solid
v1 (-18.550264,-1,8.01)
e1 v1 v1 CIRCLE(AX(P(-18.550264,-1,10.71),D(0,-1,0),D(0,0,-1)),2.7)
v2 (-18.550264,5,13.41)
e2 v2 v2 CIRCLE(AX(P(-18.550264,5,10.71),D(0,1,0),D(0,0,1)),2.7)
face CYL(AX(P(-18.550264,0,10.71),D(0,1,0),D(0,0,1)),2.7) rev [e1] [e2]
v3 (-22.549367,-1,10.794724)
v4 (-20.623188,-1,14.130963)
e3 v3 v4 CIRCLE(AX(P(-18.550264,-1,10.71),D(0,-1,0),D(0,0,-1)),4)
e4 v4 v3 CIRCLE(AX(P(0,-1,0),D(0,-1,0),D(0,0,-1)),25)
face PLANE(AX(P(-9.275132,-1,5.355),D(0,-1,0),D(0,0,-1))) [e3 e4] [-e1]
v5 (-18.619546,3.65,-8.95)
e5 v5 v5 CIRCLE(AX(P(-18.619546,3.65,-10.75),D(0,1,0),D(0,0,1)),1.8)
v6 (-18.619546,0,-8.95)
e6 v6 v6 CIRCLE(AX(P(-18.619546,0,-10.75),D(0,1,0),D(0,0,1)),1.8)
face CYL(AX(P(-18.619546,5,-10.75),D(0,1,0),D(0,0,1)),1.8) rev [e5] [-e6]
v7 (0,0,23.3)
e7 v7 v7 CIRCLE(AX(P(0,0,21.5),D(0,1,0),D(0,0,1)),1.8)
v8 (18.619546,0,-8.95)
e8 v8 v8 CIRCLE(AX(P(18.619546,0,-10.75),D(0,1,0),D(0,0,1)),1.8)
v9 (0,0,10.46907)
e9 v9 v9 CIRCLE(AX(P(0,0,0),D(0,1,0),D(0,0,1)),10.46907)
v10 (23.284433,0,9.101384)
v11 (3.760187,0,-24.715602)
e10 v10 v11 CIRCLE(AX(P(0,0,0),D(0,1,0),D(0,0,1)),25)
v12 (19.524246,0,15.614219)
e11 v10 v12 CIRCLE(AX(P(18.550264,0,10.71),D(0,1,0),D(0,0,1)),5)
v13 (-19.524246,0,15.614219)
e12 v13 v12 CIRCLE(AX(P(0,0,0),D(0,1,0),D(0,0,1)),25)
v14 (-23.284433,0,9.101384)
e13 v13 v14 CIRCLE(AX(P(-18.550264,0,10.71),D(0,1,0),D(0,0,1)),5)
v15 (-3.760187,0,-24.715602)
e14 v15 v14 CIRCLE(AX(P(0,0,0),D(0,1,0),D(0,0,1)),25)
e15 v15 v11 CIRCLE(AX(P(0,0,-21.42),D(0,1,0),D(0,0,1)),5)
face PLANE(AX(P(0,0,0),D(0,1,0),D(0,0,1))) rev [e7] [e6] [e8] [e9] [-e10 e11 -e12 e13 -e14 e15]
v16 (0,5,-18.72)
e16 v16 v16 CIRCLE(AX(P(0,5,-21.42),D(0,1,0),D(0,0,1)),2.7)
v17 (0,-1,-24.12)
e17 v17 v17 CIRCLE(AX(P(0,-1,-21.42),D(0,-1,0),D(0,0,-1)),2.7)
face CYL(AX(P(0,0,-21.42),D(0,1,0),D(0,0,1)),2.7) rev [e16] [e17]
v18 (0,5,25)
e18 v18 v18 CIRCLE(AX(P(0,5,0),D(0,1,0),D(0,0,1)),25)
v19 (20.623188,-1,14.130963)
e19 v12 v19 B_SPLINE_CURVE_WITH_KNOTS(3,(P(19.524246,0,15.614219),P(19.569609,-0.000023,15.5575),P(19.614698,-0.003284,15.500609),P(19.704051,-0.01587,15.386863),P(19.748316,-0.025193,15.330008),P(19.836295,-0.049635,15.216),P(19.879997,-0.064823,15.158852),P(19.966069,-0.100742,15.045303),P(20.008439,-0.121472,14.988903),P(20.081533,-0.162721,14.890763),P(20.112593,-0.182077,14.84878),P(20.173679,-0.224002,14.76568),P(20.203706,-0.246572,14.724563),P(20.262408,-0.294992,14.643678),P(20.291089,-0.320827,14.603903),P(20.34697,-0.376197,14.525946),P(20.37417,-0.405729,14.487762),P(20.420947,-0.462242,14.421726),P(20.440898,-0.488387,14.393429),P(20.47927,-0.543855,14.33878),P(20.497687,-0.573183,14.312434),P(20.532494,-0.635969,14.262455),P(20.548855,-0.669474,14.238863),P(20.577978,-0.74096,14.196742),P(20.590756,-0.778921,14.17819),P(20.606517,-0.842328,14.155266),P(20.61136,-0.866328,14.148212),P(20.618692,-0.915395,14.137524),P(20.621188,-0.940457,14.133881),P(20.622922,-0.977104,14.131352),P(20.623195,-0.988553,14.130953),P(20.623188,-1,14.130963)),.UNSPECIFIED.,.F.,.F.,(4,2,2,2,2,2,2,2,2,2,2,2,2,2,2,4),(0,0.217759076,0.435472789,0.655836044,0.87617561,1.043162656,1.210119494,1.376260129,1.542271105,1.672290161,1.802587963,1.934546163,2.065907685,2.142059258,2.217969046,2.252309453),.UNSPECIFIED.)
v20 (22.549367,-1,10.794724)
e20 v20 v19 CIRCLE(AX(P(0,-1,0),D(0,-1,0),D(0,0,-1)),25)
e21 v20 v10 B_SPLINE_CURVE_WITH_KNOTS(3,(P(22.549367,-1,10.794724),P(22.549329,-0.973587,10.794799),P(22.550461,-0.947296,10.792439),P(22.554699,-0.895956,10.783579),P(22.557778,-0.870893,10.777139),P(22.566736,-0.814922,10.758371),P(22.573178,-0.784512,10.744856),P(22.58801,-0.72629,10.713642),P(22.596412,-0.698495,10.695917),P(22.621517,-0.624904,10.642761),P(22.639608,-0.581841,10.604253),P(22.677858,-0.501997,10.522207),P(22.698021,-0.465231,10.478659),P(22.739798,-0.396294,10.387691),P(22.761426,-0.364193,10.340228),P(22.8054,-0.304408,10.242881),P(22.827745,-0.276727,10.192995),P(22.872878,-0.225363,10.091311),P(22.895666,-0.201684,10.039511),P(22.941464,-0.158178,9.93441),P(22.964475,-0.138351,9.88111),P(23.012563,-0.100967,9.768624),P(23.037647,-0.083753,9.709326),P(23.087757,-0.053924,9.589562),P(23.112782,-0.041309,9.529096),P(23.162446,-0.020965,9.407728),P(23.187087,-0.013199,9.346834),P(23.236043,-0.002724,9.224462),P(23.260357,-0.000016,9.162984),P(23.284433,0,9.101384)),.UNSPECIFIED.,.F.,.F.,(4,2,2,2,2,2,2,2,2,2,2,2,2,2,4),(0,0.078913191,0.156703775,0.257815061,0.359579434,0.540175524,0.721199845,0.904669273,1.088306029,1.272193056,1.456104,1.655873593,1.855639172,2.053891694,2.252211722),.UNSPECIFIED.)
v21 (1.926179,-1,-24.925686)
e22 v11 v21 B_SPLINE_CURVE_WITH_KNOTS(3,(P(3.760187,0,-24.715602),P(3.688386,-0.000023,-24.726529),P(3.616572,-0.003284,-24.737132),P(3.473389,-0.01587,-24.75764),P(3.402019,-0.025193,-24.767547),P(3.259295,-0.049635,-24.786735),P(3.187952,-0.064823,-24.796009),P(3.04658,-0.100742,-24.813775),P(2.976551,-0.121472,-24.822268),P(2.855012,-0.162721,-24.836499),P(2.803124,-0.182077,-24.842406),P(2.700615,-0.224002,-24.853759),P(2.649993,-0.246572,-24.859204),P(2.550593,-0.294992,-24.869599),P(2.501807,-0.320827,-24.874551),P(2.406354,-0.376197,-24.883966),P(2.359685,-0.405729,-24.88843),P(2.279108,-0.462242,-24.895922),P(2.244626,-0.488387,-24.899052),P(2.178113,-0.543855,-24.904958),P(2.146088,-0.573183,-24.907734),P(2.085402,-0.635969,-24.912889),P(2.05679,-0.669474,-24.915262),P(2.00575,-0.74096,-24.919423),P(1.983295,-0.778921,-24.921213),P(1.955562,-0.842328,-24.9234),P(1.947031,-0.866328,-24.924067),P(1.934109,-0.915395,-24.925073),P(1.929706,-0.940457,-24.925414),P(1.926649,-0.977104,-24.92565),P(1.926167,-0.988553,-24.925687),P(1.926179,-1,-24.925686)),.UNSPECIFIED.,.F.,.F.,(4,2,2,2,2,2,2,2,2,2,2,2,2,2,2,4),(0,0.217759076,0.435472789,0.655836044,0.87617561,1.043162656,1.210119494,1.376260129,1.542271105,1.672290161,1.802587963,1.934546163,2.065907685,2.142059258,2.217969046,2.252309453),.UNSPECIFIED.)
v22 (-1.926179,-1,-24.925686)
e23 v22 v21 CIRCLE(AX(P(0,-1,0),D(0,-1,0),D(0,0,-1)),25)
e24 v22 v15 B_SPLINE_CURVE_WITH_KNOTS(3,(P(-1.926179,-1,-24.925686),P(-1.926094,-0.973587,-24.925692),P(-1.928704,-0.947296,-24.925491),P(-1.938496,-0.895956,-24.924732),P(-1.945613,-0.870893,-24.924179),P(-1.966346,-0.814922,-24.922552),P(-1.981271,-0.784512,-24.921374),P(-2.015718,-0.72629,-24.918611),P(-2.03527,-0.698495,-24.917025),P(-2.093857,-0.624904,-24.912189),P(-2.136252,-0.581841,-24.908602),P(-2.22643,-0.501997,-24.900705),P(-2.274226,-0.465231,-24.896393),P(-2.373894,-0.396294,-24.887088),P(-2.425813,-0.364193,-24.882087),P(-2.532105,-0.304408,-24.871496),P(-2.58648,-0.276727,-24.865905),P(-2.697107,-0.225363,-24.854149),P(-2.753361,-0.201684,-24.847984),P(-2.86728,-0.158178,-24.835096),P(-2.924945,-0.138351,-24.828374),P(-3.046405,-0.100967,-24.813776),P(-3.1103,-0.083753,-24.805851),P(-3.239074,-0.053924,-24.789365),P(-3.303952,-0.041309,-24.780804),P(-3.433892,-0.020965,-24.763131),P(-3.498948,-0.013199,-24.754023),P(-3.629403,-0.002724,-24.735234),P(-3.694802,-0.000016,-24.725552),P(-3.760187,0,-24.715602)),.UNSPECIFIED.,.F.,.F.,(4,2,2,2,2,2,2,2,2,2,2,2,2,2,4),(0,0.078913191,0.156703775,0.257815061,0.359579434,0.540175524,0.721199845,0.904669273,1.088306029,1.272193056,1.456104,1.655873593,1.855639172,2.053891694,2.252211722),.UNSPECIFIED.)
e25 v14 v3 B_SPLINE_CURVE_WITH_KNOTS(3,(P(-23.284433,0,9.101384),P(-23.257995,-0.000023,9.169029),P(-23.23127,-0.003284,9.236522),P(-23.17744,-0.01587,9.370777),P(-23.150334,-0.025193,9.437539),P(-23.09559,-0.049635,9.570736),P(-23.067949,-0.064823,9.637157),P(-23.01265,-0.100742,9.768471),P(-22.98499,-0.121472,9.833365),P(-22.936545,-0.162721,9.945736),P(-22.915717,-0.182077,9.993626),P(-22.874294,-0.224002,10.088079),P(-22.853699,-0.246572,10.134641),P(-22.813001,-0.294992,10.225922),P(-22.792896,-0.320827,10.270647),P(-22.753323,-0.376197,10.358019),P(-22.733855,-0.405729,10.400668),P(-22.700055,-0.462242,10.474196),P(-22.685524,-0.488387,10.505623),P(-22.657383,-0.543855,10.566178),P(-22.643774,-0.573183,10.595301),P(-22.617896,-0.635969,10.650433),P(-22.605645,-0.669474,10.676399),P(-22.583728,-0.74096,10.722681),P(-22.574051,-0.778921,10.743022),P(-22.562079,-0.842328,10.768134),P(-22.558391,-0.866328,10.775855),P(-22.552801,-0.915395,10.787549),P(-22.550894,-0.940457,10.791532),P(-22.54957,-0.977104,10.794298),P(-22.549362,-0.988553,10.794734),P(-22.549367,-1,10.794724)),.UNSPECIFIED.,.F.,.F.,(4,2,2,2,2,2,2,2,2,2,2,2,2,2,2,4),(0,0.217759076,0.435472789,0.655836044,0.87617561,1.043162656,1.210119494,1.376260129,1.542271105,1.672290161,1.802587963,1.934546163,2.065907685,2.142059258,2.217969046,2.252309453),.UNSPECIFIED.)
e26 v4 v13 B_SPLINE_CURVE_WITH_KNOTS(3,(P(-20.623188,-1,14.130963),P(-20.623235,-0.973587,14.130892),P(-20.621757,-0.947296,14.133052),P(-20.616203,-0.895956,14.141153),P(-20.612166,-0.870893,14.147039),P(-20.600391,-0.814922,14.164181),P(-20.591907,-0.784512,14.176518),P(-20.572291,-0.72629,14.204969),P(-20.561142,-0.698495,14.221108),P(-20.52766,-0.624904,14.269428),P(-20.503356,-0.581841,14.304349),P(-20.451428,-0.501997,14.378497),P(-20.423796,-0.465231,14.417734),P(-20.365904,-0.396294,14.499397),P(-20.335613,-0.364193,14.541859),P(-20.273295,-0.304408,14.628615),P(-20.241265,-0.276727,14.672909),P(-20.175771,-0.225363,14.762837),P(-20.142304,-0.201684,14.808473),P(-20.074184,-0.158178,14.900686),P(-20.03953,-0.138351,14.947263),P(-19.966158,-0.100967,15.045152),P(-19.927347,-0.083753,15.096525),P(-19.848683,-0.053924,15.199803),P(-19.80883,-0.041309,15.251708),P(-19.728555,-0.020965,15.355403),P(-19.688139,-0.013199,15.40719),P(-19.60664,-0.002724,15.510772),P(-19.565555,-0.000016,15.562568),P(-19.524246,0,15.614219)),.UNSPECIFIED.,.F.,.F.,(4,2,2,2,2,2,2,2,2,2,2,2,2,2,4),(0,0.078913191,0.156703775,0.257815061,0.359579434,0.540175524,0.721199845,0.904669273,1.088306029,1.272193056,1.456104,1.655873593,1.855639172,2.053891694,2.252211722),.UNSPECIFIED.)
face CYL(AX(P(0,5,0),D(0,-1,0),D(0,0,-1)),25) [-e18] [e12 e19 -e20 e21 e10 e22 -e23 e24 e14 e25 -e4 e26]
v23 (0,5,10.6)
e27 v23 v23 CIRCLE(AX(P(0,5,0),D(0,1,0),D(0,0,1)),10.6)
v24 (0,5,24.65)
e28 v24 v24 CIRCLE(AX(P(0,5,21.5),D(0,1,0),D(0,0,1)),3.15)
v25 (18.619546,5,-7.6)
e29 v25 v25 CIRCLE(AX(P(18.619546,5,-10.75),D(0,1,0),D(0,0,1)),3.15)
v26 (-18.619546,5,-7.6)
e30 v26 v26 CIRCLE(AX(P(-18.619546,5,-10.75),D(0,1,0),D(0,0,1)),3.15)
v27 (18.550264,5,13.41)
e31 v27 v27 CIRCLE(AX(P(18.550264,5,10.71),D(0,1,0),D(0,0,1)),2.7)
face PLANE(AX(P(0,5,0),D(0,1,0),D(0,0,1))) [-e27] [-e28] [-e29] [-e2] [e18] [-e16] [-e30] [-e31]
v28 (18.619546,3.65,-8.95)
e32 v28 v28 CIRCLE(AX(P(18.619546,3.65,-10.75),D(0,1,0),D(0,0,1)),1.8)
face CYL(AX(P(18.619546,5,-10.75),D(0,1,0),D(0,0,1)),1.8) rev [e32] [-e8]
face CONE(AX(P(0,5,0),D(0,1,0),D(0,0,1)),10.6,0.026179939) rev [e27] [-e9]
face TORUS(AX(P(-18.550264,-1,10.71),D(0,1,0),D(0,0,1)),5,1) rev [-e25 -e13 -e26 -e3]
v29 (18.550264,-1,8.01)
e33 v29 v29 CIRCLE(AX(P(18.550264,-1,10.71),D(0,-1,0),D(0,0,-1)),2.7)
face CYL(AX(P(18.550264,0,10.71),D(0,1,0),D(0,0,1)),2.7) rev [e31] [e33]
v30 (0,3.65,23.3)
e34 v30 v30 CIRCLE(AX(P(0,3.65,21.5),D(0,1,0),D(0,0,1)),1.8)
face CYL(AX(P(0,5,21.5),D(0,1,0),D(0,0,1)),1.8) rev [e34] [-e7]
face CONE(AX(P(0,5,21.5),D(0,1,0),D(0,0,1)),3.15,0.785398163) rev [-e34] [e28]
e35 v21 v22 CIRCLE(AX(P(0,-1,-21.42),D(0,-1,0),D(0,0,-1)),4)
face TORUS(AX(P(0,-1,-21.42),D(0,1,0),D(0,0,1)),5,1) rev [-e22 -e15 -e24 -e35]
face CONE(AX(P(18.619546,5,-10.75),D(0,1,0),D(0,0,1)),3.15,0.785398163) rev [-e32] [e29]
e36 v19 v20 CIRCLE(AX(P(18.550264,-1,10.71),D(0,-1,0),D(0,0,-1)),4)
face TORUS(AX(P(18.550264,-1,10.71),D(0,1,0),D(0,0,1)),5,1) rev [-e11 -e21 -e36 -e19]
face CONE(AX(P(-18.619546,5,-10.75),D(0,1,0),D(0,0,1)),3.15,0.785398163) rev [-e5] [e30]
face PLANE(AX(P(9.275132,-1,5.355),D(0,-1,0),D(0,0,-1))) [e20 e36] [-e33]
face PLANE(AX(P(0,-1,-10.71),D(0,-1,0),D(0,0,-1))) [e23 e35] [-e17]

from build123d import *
from build123d.topology import SkipClean

# Parameters (mm, degrees)
CROQUIS1_R                                           = 25
SALIENTE_EXTRUIR1_DEPTH                              = 5
CROQUIS2_R                                           = 2.7
CORTAR_EXTRUIR2_DEPTH                                = 5
CROQUIS3_R                                           = 1.45
CORTAR_EXTRUIR3_DEPTH                                = 5
CROQUIS4_R                                           = 10.6
CORTAR_EXTRUIR4_DEPTH                                = 5
CORTAR_EXTRUIR4_DRAFT                                = -1.5
AVELLANADO_PARA_TORNILLO_CON_CABEZA_PLAN_D           = 3.6
AVELLANADO_PARA_TORNILLO_CON_CABEZA_PLAN_CSINK_D     = 6.3
AVELLANADO_PARA_TORNILLO_CON_CABEZA_PLAN_CSINK_ANGLE = 90
CROQUIS7_R                                           = 2.7
SALIENTE_EXTRUIR2_DEPTH                              = 1
REDONDEO1_R                                          = 1


with BuildPart() as part:
    # Croquis1 → Saliente-Extruir1 (new body)
    with BuildSketch(Plane(origin=(0, 0, 0), x_dir=(1, 0, 0), z_dir=(0, 1, 0))):
        with Locations(Location((0, 0, 0), (0, 0, 270))):
            Circle(CROQUIS1_R)
    extrude(amount=SALIENTE_EXTRUIR1_DEPTH)

    # Croquis2 → Cortar-Extruir2 (cut)
    with BuildSketch(Plane(origin=(0, 5, 0), x_dir=(1, 0, 0), z_dir=(0, 1, 0))):
        with Locations(Location((0, 21.42, 0), (0, 0, 270))):
            Circle(CROQUIS2_R)
        with Locations(Location((18.550264149, -10.71, 0), (0, 0, 270))):
            Circle(CROQUIS2_R)
        with Locations(Location((-18.550264149, -10.71, 0), (0, 0, 270))):
            Circle(CROQUIS2_R)
    extrude(amount=-CORTAR_EXTRUIR2_DEPTH, mode=Mode.SUBTRACT)

    # Croquis3 → Cortar-Extruir3 (cut)
    with BuildSketch(Plane(origin=(0, 5, 0), x_dir=(1, 0, 0), z_dir=(0, 1, 0))):
        with Locations(Location((0, -21.5, 0), (0, 0, 270))):
            Circle(CROQUIS3_R)
        with Locations(Location((-18.619546181, 10.75, 0), (0, 0, 270))):
            Circle(CROQUIS3_R)
        with Locations(Location((18.619546181, 10.75, 0), (0, 0, 270))):
            Circle(CROQUIS3_R)
    extrude(amount=-CORTAR_EXTRUIR3_DEPTH, mode=Mode.SUBTRACT)


with BuildPart() as cortar_extruir4_tool:
    # Croquis4 → Cortar-Extruir4 (with draft: the straight prism first)
    with BuildSketch(Plane(origin=(0, 5, 0), x_dir=(1, 0, 0), z_dir=(0, 1, 0))):
        Circle(CROQUIS4_R)
    extrude(amount=-CORTAR_EXTRUIR4_DEPTH)
    # Cortar-Extruir4: the draft: its side faces are tilted about the plane it starts from
    cortar_extruir4_sides = [cortar_extruir4_tool.faces().sort_by_distance(p)[0] for p in [
        (-10.6, 2.5, 0),
    ]]
    draft(cortar_extruir4_sides, Plane(origin=(0, 5, 0), x_dir=(1, 0, 0), z_dir=(0, 1, 0)), CORTAR_EXTRUIR4_DRAFT)


with BuildPart() as part_1:
    add(part.part)

    # Cortar-Extruir4: cut by cortar_extruir4_tool
    add(cortar_extruir4_tool.part, mode=Mode.SUBTRACT)

    # Avellanado para tornillo con cabeza plana de M31 (through all)
    with Locations(Plane(origin=(0, 5, 0), x_dir=(1, 0, 0), z_dir=(0, 1, 0))):
        with Locations((-18.619546181, 10.75), (18.619546181, 10.75), (0, -21.5)):
            CounterSinkHole(AVELLANADO_PARA_TORNILLO_CON_CABEZA_PLAN_D / 2, AVELLANADO_PARA_TORNILLO_CON_CABEZA_PLAN_CSINK_D / 2, counter_sink_angle=AVELLANADO_PARA_TORNILLO_CON_CABEZA_PLAN_CSINK_ANGLE)

    # Croquis7 → Saliente-Extruir2 (add)
    # profile 1 of 3: a face of its own
    with SkipClean():  # the faces are left unmerged after this step: merging them gives an invalid solid
        with BuildSketch(Plane(origin=(0, 0, 0), x_dir=(-1, 0, 0), z_dir=(0, -1, 0))):
            with BuildLine():
                ThreePointArc((22.549366787, -10.794723595), (15.086162534, -8.71), (20.623188254, -14.13096268))
                ThreePointArc((20.623188254, -14.13096268), (21.650635095, -12.5), (22.549366787, -10.794723595))
            make_face()
            with Locations(Location((18.550264149, -10.71, 0), (0, 0, 270))):
                Circle(CROQUIS7_R, mode=Mode.SUBTRACT)
        # profile 2 of 3: a face of its own
        with BuildSketch(Plane(origin=(0, 0, 0), x_dir=(-1, 0, 0), z_dir=(0, -1, 0))):
            with BuildLine():
                ThreePointArc((-20.623188254, -14.13096268), (-15.086162534, -8.71), (-22.549366787, -10.794723595))
                ThreePointArc((-22.549366787, -10.794723595), (-21.650635095, -12.5), (-20.623188254, -14.13096268))
            make_face()
            with Locations(Location((-18.550264149, -10.71, 0), (0, 0, 270))):
                Circle(CROQUIS7_R, mode=Mode.SUBTRACT)
        # profile 3 of 3: a face of its own
        with BuildSketch(Plane(origin=(0, 0, 0), x_dir=(-1, 0, 0), z_dir=(0, -1, 0))):
            with BuildLine():
                ThreePointArc((-1.926178534, 24.925686275), (0, 17.42), (1.926178534, 24.925686275))
                ThreePointArc((1.926178534, 24.925686275), (0, 25), (-1.926178534, 24.925686275))
            make_face()
            with Locations(Location((0, 21.42, 0), (0, 0, 270))):
                Circle(CROQUIS7_R, mode=Mode.SUBTRACT)
        extrude(amount=SALIENTE_EXTRUIR2_DEPTH)

    # Redondeo1
    # the kernel refuses this fillet: 1 mm, written as the material it adds along each edge
    with BuildSketch(Plane(origin=(0, 0, -21.42), x_dir=(0.0031415874858800596, 0, -0.9999950652018583), z_dir=(-0.9999950652018583, 0, -0.0031415874858800596))) as redondeo1_piece_1_section:
        with BuildLine():
            CenterArc((4 + REDONDEO1_R, REDONDEO1_R), REDONDEO1_R, 180, 90)
            Line((4, REDONDEO1_R), (4, 0))
            Line((4, 0), (4 + REDONDEO1_R, 0))
        make_face()
    redondeo1_piece_1 = revolve(axis=Axis((0, 0, -21.42), (0, -1, 0)), revolution_arc=359.64, mode=Mode.PRIVATE)
    redondeo1_piece_1 = redondeo1_piece_1 & Plane(origin=(0, -0.280437839, 0), x_dir=(0, 0, 1), z_dir=(0, -1, 0)) * Cylinder(25, 21, mode=Mode.PRIVATE)
    add(redondeo1_piece_1)
    with BuildSketch(Plane(origin=(18.550264149, 0, 10.71), x_dir=(0.8644503363809782, 0, 0.5027182271718559), z_dir=(0.5027182271718559, 0, -0.8644503363809782))) as redondeo1_piece_2_section:
        with BuildLine():
            CenterArc((4 + REDONDEO1_R, REDONDEO1_R), REDONDEO1_R, 180, 90)
            Line((4, REDONDEO1_R), (4, 0))
            Line((4, 0), (4 + REDONDEO1_R, 0))
        make_face()
    redondeo1_piece_2 = revolve(axis=Axis((18.550264149, 0, 10.71), (0, -1, 0)), revolution_arc=359.64, mode=Mode.PRIVATE)
    redondeo1_piece_2 = redondeo1_piece_2 & Plane(origin=(0, -0.280437839, 0), x_dir=(0, 0, 1), z_dir=(0, -1, 0)) * Cylinder(25, 21, mode=Mode.PRIVATE)
    add(redondeo1_piece_2)
    with BuildSketch(Plane(origin=(-18.550264149, 0, 10.71), x_dir=(-0.867591923866794, 0, 0.49727683803000045), z_dir=(0.49727683803000045, 0, 0.867591923866794))) as redondeo1_piece_3_section:
        with BuildLine():
            CenterArc((4 + REDONDEO1_R, REDONDEO1_R), REDONDEO1_R, 180, 90)
            Line((4, REDONDEO1_R), (4, 0))
            Line((4, 0), (4 + REDONDEO1_R, 0))
        make_face()
    redondeo1_piece_3 = revolve(axis=Axis((-18.550264149, 0, 10.71), (0, -1, 0)), revolution_arc=359.64, mode=Mode.PRIVATE)
    redondeo1_piece_3 = redondeo1_piece_3 & Plane(origin=(0, -0.280437839, 0), x_dir=(0, 0, 1), z_dir=(0, -1, 0)) * Cylinder(25, 20, mode=Mode.PRIVATE)
    add(redondeo1_piece_3)


solid = part_1.part
